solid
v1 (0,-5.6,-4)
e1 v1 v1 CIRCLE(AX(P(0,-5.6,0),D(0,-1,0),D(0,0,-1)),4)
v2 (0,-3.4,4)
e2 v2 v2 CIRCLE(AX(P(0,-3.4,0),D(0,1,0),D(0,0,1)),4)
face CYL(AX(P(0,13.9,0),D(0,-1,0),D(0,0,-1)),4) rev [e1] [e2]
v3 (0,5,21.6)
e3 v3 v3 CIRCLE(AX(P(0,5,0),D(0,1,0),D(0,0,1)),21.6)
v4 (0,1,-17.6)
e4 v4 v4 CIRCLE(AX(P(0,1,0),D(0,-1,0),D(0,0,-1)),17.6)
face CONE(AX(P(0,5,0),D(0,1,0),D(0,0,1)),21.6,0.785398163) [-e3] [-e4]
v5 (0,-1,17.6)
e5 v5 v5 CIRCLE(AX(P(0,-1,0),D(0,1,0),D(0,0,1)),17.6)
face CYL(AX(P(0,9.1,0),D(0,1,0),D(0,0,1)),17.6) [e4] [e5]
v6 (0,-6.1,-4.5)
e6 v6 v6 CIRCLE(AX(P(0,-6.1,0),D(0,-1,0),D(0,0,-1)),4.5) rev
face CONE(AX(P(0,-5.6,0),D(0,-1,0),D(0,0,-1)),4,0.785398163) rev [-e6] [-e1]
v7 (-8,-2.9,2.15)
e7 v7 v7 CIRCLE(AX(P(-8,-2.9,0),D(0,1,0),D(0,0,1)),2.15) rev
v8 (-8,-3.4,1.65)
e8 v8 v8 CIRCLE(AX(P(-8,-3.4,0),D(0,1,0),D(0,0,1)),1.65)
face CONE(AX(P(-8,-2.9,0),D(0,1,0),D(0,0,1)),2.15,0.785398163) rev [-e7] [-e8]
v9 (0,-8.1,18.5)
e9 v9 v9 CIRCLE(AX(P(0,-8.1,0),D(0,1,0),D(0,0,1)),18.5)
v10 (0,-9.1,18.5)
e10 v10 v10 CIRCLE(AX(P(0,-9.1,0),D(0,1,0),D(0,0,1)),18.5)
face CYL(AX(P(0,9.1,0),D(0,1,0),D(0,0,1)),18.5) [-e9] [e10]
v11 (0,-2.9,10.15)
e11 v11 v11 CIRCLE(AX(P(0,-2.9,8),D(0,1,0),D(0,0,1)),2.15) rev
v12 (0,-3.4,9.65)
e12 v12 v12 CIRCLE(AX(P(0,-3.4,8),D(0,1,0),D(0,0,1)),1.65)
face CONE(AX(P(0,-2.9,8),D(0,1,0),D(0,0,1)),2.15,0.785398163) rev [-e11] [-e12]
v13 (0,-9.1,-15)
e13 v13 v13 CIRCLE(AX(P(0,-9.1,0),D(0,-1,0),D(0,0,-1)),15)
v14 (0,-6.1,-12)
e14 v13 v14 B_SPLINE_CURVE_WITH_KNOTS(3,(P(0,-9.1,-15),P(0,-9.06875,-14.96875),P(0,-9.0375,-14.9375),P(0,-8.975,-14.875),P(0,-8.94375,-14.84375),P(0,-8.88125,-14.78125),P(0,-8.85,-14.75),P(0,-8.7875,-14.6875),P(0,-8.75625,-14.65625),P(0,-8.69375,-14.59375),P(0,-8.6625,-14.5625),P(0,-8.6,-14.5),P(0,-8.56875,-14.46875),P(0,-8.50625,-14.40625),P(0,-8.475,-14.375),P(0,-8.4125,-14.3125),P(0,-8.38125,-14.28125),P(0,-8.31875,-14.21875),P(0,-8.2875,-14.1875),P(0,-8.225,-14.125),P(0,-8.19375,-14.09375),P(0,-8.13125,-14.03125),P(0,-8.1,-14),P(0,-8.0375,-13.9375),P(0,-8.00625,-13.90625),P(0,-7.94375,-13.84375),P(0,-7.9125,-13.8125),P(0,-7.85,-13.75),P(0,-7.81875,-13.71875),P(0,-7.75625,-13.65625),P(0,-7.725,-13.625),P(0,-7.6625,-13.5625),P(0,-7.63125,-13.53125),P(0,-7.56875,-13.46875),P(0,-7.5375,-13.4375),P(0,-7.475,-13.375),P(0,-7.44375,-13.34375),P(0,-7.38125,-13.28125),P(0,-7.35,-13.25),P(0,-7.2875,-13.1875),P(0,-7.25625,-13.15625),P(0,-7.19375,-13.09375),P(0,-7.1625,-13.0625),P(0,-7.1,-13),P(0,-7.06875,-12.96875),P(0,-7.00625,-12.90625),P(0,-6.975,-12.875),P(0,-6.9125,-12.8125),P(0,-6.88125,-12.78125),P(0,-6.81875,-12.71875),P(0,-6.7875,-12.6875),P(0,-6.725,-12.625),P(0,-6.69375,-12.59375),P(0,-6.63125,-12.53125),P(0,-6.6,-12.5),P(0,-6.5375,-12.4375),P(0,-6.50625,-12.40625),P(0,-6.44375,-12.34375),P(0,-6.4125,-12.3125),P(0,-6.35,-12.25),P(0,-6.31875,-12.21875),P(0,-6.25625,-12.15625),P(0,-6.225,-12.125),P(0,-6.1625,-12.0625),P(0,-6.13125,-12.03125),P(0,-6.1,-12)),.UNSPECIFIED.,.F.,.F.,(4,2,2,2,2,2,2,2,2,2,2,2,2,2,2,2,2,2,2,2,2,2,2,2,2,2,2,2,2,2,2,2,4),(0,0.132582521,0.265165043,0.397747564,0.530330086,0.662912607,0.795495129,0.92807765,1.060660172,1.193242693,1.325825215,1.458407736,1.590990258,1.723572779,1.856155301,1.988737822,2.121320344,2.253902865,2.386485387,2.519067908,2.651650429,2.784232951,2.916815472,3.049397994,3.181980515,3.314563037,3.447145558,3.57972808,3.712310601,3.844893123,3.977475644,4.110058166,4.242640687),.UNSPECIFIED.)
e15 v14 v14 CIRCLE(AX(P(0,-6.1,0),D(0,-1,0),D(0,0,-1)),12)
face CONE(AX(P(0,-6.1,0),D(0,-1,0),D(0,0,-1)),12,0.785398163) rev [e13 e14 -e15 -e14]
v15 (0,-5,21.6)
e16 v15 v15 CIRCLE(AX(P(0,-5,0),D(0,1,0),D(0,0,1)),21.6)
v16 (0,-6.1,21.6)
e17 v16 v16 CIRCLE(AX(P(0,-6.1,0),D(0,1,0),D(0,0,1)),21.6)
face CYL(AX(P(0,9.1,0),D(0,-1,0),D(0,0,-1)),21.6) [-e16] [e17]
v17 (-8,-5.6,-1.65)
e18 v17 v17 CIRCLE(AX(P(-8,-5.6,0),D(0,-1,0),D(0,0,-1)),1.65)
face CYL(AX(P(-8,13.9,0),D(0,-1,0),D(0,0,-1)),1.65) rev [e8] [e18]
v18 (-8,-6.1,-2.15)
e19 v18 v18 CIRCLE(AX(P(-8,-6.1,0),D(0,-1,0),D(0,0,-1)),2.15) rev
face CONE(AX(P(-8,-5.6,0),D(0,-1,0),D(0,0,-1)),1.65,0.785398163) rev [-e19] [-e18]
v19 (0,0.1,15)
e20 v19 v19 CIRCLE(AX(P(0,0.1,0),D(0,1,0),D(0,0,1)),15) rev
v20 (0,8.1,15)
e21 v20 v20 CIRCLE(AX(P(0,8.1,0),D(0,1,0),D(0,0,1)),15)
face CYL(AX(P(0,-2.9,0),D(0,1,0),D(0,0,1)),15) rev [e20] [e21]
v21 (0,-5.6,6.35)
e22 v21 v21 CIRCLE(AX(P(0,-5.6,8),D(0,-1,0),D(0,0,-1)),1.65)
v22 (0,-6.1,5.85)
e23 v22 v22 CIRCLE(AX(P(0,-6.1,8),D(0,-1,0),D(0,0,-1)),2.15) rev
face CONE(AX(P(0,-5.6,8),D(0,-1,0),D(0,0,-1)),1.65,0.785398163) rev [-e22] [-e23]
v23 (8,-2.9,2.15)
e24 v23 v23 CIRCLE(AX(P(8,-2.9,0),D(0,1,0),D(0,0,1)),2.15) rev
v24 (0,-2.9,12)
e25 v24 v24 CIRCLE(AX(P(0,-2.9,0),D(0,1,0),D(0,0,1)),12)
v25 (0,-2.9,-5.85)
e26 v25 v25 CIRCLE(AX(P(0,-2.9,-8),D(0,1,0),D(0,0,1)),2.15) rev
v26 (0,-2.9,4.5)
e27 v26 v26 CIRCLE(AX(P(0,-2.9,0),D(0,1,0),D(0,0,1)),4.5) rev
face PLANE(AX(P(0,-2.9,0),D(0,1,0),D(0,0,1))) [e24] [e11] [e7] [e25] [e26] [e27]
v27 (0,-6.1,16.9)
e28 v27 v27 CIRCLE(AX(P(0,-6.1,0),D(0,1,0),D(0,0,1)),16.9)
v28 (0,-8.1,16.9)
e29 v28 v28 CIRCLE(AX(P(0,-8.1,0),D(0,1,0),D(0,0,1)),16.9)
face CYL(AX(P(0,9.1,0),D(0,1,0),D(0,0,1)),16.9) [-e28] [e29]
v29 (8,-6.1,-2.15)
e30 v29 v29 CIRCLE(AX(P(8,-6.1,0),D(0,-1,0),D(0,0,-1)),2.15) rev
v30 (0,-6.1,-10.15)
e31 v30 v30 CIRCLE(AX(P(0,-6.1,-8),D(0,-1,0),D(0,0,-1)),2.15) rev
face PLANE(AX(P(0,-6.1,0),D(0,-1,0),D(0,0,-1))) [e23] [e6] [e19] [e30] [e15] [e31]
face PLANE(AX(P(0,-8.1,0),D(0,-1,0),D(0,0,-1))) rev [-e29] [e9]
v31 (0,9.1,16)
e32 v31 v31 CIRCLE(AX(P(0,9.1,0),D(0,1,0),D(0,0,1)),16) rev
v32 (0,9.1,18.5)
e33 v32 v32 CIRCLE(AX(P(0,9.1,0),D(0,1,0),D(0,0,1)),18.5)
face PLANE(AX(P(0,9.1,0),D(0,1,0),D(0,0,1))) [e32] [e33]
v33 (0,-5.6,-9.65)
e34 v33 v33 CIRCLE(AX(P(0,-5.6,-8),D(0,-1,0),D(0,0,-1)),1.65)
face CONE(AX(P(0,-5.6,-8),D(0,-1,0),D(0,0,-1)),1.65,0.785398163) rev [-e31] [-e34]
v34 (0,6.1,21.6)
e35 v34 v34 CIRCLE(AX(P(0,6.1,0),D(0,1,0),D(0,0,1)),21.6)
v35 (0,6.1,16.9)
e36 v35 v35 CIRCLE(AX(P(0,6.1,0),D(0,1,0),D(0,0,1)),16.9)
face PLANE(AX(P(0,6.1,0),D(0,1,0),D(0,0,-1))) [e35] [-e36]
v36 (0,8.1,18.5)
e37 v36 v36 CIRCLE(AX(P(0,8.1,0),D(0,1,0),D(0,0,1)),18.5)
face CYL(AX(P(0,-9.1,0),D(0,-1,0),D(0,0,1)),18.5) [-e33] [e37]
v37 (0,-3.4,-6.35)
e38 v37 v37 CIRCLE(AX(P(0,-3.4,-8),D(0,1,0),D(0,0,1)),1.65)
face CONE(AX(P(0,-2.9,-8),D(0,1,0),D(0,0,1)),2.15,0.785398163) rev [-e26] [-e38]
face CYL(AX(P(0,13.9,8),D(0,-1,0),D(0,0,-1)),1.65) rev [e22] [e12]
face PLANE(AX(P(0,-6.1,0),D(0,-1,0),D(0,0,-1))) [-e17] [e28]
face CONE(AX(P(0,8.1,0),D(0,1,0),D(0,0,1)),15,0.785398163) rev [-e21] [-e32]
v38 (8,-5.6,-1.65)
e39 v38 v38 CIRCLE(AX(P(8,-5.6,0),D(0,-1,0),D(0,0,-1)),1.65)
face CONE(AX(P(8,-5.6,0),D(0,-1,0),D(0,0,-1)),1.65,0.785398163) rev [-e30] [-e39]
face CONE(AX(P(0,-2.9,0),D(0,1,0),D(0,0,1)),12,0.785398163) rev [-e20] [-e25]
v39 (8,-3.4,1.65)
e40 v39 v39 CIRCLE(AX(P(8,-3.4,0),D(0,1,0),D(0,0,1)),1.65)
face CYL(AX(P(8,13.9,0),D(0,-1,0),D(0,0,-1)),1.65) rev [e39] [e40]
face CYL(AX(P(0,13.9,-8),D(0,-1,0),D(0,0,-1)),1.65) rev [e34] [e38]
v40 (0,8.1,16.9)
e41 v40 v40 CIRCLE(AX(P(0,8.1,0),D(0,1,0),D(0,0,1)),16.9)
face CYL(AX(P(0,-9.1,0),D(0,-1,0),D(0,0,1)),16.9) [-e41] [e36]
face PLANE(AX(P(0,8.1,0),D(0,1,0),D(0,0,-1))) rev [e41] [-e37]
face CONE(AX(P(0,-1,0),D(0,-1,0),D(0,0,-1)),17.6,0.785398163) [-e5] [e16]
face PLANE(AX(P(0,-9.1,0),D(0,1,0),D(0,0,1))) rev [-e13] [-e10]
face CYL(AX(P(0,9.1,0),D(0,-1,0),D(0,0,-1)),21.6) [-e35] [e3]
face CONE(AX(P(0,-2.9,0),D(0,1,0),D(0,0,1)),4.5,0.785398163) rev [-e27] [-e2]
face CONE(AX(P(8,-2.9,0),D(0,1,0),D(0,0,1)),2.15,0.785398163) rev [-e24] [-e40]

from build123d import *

# Parameters (mm, degrees)
SKETCH_1_R               = 21.6
EXTRUDE_1_DEPTH          = 9.1
SKETCH_2_W               = 4.7
SKETCH_2_H               = 2
SKETCH_2_W_2             = 3.1
SKETCH_2_H_2             = 1
SKETCH_3_R               = 15
CUT_EXTRUDE_1_DEPTH      = 3
SKETCH_4_R               = 4
CUT_EXTRUDE_2_DEPTH      = 20
SKETCH_5_R               = 1.65
CUT_EXTRUDE_3_DEPTH      = 20
PATTERN_CIRCULAR_1_COUNT = 4
CUT_EXTRUDE_START        = -6.2
SKETCH_3_2_R             = 15
CUT_EXTRUDE_4_DEPTH      = 12
SKETCH_6_W               = 4
SKETCH_6_H               = 10
CHAMFER_1_SIZE           = 4
CHAMFER_2_SIZE           = 3
CHAMFER_3_SIZE           = 1
CHAMFER_4_SIZE           = 0.5


with BuildPart() as part:
    # 草图1 → 凸台-拉伸1 (new, symmetric)
    with BuildSketch(Plane(origin=(0, 0, 0), x_dir=(1, 0, 0), z_dir=(0, 1, 0))):
        with Locations(Location((0, 0, 0), (0, 0, 270))):
            Circle(SKETCH_1_R)
    extrude(amount=EXTRUDE_1_DEPTH, both=True)

    # 草图2 → 切除-旋转1 (revolve, cut)
    with BuildSketch(Plane.XY, mode=Mode.PRIVATE) as cut_revolve_1_sk:
        with Locations((19.25, -7.1)):
            Rectangle(SKETCH_2_W, SKETCH_2_H)
        with Locations((20.05, -8.6)):
            Rectangle(SKETCH_2_W_2, SKETCH_2_H_2)
    cut_revolve_1 = revolve(cut_revolve_1_sk.sketch.rotate(Axis((0, 9.1, 0), (0, -1, 0)), 90), axis=Axis((0, 9.1, 0), (0, -1, 0)), mode=Mode.SUBTRACT)

    # 镜向1: 切除-旋转1 across plane
    add(cut_revolve_1.mirror(Plane.ZX), mode=Mode.SUBTRACT)

    # 草图3 → 切除-拉伸1 (cut)
    with BuildSketch(Plane.XZ.offset(9.1)):
        with Locations(Location((0, 0, 0), (0, 0, 270))):
            Circle(SKETCH_3_R)
    extrude(amount=-CUT_EXTRUDE_1_DEPTH, mode=Mode.SUBTRACT)

    # 草图4 → 切除-拉伸2 (cut)
    with BuildSketch(Plane.XZ.offset(6.1)):
        with Locations(Location((0, 0, 0), (0, 0, 270))):
            Circle(SKETCH_4_R)
    extrude(amount=-CUT_EXTRUDE_2_DEPTH, mode=Mode.SUBTRACT)

    # 草图5 → 切除-拉伸3 (cut)
    with BuildSketch(Plane.XZ.offset(6.1)):
        with Locations(Location((-8, 0, 0), (0, 0, 270))):
            Circle(SKETCH_5_R)
    cut_extrude_3 = extrude(amount=-CUT_EXTRUDE_3_DEPTH, mode=Mode.SUBTRACT)

    # 阵列(圆周)1: 切除-拉伸3 ×4 about axis
    pattern_circular_1_axis = Axis((0, 0, 0), (0, 1, 0))
    for i in range(1, PATTERN_CIRCULAR_1_COUNT):
        add(cut_extrude_3.rotate(pattern_circular_1_axis, i * 360 / PATTERN_CIRCULAR_1_COUNT), mode=Mode.SUBTRACT)

    # 草图3<2> → 切除-拉伸4 (cut)
    with BuildSketch(Plane.XZ.offset(9.1).offset(CUT_EXTRUDE_START)):
        with Locations(Location((0, 0, 0), (0, 0, 270))):
            Circle(SKETCH_3_2_R)
    extrude(amount=-CUT_EXTRUDE_4_DEPTH, mode=Mode.SUBTRACT)

    # 草图6 → 切除-旋转2 (revolve, cut)
    with BuildSketch(Plane.XY, mode=Mode.PRIVATE) as cut_revolve_2_sk:
        with Locations((19.6, 0)):
            Rectangle(SKETCH_6_W, SKETCH_6_H)
    revolve(cut_revolve_2_sk.sketch.rotate(Axis((0, 9.1, 0), (0, -1, 0)), 90), axis=Axis((0, 9.1, 0), (0, -1, 0)), mode=Mode.SUBTRACT)

    # 倒角1
    chamfer_1_edges = [part.edges().sort_by_distance(p)[0] for p in [
        (0, -5, -17.6),
        (0, 5, -17.6),
    ]]
    chamfer(chamfer_1_edges, length=CHAMFER_1_SIZE - 0.0001)  # a hair under: the kernel refuses the full size

    # 倒角2
    chamfer_2_edges = [part.edges().sort_by_distance(p)[0] for p in [
        (0, -6.1, 15),
        (0, -2.9, 15),
    ]]
    chamfer(chamfer_2_edges, length=CHAMFER_2_SIZE - 0.0001)  # a hair under: the kernel refuses the full size

    # 倒角3
    chamfer_3_edges = [part.edges().sort_by_distance(p)[0] for p in [
        (0, 9.1, 15),
    ]]
    chamfer(chamfer_3_edges, length=CHAMFER_3_SIZE)

    # 倒角4
    chamfer_4_edges = [part.edges().sort_by_distance(p)[0] for p in [
        (0, -6.1, 4),
        (-8, -6.1, 1.65),
        (-1.65, -6.1, -8),
        (8, -6.1, -1.65),
        (1.65, -6.1, 8),
        (0, -2.9, 4),
        (-8, -2.9, 1.65),
        (1.65, -2.9, 8),
        (8, -2.9, -1.65),
        (-1.65, -2.9, -8),
    ]]
    chamfer(chamfer_4_edges, length=CHAMFER_4_SIZE)


solid = part.part
